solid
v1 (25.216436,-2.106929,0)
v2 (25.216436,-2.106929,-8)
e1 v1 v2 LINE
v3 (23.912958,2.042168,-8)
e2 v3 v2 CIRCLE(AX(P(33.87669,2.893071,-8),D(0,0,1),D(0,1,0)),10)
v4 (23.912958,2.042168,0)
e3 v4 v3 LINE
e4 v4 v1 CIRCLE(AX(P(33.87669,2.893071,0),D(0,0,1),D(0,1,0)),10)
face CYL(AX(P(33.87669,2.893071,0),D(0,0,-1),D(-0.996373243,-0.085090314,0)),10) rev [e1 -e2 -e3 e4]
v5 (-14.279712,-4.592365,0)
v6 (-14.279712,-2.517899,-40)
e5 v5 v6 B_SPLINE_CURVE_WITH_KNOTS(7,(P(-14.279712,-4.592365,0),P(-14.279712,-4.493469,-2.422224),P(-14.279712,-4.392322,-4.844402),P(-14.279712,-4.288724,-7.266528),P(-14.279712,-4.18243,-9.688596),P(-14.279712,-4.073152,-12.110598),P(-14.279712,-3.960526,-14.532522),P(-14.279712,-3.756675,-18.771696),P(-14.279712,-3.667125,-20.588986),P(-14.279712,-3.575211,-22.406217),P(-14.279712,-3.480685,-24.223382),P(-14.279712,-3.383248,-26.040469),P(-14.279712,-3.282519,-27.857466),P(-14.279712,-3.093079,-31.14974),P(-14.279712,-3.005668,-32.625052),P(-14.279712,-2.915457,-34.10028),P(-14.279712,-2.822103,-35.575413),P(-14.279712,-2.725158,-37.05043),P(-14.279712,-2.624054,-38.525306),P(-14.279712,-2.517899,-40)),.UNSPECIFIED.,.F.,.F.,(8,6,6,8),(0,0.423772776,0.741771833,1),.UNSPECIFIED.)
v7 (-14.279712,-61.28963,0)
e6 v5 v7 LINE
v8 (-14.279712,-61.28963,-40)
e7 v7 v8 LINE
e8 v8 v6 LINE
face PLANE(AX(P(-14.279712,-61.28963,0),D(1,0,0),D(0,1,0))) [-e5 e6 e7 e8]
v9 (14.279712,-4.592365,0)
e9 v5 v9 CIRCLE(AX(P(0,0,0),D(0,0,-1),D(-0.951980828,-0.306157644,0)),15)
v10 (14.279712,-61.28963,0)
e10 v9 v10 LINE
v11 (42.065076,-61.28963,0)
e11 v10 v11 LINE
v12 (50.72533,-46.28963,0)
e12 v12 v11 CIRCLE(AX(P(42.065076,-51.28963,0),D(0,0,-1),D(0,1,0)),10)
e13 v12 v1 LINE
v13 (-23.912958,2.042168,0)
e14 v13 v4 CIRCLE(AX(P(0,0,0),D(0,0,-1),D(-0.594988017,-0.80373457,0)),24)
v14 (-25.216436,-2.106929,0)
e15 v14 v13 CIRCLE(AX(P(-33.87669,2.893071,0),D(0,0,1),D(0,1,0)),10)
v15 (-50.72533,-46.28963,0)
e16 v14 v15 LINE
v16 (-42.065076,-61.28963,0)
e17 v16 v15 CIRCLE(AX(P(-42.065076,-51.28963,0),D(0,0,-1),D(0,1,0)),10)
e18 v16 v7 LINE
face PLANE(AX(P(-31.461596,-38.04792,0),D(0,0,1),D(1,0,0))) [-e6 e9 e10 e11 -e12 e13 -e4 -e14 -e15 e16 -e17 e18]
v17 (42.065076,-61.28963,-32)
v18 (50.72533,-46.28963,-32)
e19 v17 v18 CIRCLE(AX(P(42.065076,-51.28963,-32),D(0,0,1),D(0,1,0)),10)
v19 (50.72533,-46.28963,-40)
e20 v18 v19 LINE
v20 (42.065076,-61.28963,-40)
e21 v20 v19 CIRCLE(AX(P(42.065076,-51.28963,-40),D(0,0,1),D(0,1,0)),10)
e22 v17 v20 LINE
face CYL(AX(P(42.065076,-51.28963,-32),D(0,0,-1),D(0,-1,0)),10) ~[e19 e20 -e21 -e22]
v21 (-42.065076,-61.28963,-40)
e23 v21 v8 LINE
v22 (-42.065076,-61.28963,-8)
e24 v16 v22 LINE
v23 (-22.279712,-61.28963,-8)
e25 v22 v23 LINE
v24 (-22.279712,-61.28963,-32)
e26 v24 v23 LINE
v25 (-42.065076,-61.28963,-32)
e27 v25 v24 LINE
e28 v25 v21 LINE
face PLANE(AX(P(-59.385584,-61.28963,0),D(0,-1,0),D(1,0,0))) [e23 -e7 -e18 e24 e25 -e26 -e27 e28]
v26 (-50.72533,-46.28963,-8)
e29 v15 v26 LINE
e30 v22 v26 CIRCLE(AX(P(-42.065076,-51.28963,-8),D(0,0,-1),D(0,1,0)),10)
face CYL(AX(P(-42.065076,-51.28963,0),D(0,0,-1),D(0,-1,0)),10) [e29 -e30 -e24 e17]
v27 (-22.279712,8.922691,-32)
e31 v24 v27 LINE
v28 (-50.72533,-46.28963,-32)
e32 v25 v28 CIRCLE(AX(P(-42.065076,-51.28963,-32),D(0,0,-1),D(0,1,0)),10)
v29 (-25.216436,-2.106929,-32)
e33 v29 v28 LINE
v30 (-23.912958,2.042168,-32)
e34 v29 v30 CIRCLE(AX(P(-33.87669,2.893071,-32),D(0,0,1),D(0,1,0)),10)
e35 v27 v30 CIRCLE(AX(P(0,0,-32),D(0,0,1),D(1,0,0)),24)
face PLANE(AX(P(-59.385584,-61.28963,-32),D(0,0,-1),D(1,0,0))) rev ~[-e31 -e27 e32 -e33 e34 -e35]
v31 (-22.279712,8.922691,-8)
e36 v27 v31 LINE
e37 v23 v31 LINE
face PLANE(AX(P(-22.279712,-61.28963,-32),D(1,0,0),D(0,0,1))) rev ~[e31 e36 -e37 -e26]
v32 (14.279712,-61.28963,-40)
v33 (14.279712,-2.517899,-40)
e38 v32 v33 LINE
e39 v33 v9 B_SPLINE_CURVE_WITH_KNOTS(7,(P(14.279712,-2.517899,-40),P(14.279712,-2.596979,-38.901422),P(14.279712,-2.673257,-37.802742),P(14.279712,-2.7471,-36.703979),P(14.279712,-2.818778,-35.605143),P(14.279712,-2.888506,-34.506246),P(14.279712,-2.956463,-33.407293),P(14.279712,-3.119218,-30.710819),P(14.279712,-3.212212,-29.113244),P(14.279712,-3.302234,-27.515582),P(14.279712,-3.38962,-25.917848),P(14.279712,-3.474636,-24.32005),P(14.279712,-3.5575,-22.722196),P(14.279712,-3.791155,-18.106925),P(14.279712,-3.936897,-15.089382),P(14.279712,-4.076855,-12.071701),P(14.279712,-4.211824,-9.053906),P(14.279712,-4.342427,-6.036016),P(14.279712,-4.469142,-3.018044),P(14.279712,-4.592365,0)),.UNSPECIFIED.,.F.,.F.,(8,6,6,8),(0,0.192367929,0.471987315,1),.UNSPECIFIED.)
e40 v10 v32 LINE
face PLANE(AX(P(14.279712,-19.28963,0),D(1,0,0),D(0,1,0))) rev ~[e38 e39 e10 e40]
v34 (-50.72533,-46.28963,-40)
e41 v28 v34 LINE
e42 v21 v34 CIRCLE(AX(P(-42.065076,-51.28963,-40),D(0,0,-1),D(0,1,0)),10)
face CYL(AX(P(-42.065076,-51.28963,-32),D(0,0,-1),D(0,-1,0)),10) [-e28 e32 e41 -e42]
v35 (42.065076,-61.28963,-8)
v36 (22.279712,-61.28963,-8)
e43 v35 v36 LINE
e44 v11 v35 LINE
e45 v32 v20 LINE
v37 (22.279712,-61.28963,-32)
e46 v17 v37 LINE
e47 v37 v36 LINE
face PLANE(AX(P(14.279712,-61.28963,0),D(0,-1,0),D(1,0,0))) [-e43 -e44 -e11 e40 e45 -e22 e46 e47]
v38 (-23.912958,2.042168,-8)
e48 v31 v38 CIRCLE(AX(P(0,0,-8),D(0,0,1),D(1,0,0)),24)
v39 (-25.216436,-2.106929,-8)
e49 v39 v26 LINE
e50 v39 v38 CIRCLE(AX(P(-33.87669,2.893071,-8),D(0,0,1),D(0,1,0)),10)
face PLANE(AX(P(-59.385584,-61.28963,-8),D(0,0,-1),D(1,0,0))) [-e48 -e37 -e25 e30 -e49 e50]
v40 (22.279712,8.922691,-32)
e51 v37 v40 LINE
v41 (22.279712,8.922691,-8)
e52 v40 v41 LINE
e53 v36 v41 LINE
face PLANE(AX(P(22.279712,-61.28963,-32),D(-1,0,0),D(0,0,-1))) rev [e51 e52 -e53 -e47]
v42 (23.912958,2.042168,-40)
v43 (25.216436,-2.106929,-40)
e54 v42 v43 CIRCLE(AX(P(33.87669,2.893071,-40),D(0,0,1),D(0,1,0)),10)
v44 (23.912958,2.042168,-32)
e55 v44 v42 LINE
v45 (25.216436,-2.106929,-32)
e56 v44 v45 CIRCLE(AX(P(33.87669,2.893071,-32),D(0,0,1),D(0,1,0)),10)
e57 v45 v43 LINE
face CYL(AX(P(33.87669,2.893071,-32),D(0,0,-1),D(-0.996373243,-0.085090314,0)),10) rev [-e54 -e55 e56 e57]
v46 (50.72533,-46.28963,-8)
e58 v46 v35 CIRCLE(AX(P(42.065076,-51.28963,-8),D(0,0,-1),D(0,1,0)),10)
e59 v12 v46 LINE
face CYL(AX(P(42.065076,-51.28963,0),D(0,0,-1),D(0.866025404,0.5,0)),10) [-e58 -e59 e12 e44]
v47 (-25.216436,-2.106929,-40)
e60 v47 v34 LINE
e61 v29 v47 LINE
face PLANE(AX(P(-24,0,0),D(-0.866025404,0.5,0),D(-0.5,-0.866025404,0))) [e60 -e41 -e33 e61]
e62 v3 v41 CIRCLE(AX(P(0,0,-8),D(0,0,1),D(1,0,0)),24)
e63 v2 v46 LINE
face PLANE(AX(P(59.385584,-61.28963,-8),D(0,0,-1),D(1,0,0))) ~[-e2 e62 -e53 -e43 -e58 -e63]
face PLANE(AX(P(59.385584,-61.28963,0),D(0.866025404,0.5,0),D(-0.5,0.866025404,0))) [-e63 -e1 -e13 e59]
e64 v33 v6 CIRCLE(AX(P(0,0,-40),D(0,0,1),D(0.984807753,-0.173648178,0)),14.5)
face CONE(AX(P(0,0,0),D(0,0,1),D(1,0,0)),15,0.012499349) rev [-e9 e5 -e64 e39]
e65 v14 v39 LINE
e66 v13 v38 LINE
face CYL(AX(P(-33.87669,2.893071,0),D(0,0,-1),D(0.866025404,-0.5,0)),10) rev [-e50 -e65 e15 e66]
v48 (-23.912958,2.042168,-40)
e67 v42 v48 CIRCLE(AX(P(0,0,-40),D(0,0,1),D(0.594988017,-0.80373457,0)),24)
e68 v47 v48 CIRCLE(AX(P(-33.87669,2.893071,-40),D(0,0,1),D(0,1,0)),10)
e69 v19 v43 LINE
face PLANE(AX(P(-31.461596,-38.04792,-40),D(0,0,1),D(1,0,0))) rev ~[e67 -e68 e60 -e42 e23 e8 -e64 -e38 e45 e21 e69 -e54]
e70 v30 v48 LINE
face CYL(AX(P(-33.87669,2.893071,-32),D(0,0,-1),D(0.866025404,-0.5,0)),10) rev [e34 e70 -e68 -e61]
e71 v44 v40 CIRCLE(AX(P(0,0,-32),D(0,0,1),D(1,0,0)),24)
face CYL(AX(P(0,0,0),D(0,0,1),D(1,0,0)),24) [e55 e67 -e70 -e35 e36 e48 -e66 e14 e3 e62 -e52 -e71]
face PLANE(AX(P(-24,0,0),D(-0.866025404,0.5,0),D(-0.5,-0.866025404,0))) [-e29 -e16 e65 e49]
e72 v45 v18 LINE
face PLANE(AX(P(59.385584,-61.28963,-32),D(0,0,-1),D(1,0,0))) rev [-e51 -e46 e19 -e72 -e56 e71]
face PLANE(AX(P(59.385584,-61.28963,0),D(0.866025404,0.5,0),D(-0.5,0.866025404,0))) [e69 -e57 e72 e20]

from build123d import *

# Parameters (mm, degrees)
F3_R      = 24
F4_DEPTH  = 40
F0_R      = 15
F2_R      = 14.5
F7_DEPTH  = 40.0010001
F9_DEPTH  = 40
F10_W     = 37.1058717763
F10_H     = 24
F11_DEPTH = 85.2906296813
F12_R     = 10
F13_R     = 10


# Not quite as in the source:
# - a pattern or mirror of a feature is missing from the dataset's text; its kind, count and spacing are read off the source's solid


with BuildPart() as f4:
    # F3 (on Top) → F4 (new body)
    with BuildSketch(Plane.XY):
        Circle(F3_R)
    extrude(amount=-F4_DEPTH)

    # F0 (on Top) → F5 section 0
    with BuildSketch(Plane.XY):
        Circle(F0_R)
    # F2 (on offset) → F5 section 1
    with BuildSketch(Plane.XY.offset(-40)):
        Circle(F2_R)
    loft(mode=Mode.SUBTRACT)

    # F6 (on face) → F7 (cut, through all)
    with BuildSketch(Plane.XY):
        with BuildLine():
            Line((-14.2797124187, -4.5923646676), (-14.2797124187, -19.2896296813))
            ThreePointArc((-14.2797124187, -19.2896296813), (0, -24), (14.2797124187, -19.2896296813))
            Line((14.2797124187, -19.2896296813), (14.2797124187, -4.5923646676))
            ThreePointArc((14.2797124187, -4.5923646676), (0, -15), (-14.2797124187, -4.5923646676))
        make_face()
        with BuildLine():
            Line((-14.2797124187, -2.5178985762), (-14.2797124187, -4.5923646676))
            ThreePointArc((-14.2797124187, -4.5923646676), (0, -15), (14.2797124187, -4.5923646676))
            Line((14.2797124187, -4.5923646676), (14.2797124187, -2.5178985762))
            ThreePointArc((14.2797124187, -2.5178985762), (0, -14.5), (-14.2797124187, -2.5178985762))
        make_face()
    extrude(amount=-F7_DEPTH, mode=Mode.SUBTRACT)

    # F8 (on face) → F9 (join)
    with BuildSketch(Plane.XY):
        with BuildLine():
            Line((-14.2797124187, -61.2896296813), (-14.2797124187, -19.2896296813))
            ThreePointArc((-14.2797124187, -19.2896296813), (-21.4326048119, -10.8001597662), (-24, 0))
            Line((-24, 0), (-59.385584195, -61.2896296813))
            Line((-59.385584195, -61.2896296813), (-14.2797124187, -61.2896296813))
        make_face()
        with BuildLine():
            ThreePointArc((24, 0), (21.4326048119, -10.8001597662), (14.2797124187, -19.2896296813))
            Line((14.2797124187, -19.2896296813), (14.2797124187, -61.2896296813))
            Line((14.2797124187, -61.2896296813), (59.385584195, -61.2896296813))
            Line((59.385584195, -61.2896296813), (24, 0))
        make_face()
    extrude(amount=-F9_DEPTH)

    # F10 (on face) → F11 (cut, through all)
    with BuildSketch(Plane.XZ.offset(61.2896296813)):
        with Locations((-40.8326483068, -20)):
            Rectangle(F10_W, F10_H)
    f11 = extrude(amount=-F11_DEPTH, mode=Mode.SUBTRACT)

    # F11_copies: F11 across plane
    add(f11.mirror(Plane(origin=(0, 0, 0), x_dir=(0, 0, 1), z_dir=(1, 0, 0))), mode=Mode.SUBTRACT)

    # F12
    f12_edges = [f4.edges().sort_by_distance(p)[0] for p in [
        (-59.385584, -61.28963, -4),
        (-59.385584, -61.28963, -36),
        (-24, 0, -4),
        (-24, 0, -36),
    ]]
    fillet(f12_edges, radius=F12_R)

    # F13
    f13_edges = [f4.edges().sort_by_distance(p)[0] for p in [
        (59.385584, -61.28963, -4),
        (59.385584, -61.28963, -36),
        (24, 0, -4),
        (24, 0, -36),
    ]]
    fillet(f13_edges, radius=F13_R)


solid = f4.part
